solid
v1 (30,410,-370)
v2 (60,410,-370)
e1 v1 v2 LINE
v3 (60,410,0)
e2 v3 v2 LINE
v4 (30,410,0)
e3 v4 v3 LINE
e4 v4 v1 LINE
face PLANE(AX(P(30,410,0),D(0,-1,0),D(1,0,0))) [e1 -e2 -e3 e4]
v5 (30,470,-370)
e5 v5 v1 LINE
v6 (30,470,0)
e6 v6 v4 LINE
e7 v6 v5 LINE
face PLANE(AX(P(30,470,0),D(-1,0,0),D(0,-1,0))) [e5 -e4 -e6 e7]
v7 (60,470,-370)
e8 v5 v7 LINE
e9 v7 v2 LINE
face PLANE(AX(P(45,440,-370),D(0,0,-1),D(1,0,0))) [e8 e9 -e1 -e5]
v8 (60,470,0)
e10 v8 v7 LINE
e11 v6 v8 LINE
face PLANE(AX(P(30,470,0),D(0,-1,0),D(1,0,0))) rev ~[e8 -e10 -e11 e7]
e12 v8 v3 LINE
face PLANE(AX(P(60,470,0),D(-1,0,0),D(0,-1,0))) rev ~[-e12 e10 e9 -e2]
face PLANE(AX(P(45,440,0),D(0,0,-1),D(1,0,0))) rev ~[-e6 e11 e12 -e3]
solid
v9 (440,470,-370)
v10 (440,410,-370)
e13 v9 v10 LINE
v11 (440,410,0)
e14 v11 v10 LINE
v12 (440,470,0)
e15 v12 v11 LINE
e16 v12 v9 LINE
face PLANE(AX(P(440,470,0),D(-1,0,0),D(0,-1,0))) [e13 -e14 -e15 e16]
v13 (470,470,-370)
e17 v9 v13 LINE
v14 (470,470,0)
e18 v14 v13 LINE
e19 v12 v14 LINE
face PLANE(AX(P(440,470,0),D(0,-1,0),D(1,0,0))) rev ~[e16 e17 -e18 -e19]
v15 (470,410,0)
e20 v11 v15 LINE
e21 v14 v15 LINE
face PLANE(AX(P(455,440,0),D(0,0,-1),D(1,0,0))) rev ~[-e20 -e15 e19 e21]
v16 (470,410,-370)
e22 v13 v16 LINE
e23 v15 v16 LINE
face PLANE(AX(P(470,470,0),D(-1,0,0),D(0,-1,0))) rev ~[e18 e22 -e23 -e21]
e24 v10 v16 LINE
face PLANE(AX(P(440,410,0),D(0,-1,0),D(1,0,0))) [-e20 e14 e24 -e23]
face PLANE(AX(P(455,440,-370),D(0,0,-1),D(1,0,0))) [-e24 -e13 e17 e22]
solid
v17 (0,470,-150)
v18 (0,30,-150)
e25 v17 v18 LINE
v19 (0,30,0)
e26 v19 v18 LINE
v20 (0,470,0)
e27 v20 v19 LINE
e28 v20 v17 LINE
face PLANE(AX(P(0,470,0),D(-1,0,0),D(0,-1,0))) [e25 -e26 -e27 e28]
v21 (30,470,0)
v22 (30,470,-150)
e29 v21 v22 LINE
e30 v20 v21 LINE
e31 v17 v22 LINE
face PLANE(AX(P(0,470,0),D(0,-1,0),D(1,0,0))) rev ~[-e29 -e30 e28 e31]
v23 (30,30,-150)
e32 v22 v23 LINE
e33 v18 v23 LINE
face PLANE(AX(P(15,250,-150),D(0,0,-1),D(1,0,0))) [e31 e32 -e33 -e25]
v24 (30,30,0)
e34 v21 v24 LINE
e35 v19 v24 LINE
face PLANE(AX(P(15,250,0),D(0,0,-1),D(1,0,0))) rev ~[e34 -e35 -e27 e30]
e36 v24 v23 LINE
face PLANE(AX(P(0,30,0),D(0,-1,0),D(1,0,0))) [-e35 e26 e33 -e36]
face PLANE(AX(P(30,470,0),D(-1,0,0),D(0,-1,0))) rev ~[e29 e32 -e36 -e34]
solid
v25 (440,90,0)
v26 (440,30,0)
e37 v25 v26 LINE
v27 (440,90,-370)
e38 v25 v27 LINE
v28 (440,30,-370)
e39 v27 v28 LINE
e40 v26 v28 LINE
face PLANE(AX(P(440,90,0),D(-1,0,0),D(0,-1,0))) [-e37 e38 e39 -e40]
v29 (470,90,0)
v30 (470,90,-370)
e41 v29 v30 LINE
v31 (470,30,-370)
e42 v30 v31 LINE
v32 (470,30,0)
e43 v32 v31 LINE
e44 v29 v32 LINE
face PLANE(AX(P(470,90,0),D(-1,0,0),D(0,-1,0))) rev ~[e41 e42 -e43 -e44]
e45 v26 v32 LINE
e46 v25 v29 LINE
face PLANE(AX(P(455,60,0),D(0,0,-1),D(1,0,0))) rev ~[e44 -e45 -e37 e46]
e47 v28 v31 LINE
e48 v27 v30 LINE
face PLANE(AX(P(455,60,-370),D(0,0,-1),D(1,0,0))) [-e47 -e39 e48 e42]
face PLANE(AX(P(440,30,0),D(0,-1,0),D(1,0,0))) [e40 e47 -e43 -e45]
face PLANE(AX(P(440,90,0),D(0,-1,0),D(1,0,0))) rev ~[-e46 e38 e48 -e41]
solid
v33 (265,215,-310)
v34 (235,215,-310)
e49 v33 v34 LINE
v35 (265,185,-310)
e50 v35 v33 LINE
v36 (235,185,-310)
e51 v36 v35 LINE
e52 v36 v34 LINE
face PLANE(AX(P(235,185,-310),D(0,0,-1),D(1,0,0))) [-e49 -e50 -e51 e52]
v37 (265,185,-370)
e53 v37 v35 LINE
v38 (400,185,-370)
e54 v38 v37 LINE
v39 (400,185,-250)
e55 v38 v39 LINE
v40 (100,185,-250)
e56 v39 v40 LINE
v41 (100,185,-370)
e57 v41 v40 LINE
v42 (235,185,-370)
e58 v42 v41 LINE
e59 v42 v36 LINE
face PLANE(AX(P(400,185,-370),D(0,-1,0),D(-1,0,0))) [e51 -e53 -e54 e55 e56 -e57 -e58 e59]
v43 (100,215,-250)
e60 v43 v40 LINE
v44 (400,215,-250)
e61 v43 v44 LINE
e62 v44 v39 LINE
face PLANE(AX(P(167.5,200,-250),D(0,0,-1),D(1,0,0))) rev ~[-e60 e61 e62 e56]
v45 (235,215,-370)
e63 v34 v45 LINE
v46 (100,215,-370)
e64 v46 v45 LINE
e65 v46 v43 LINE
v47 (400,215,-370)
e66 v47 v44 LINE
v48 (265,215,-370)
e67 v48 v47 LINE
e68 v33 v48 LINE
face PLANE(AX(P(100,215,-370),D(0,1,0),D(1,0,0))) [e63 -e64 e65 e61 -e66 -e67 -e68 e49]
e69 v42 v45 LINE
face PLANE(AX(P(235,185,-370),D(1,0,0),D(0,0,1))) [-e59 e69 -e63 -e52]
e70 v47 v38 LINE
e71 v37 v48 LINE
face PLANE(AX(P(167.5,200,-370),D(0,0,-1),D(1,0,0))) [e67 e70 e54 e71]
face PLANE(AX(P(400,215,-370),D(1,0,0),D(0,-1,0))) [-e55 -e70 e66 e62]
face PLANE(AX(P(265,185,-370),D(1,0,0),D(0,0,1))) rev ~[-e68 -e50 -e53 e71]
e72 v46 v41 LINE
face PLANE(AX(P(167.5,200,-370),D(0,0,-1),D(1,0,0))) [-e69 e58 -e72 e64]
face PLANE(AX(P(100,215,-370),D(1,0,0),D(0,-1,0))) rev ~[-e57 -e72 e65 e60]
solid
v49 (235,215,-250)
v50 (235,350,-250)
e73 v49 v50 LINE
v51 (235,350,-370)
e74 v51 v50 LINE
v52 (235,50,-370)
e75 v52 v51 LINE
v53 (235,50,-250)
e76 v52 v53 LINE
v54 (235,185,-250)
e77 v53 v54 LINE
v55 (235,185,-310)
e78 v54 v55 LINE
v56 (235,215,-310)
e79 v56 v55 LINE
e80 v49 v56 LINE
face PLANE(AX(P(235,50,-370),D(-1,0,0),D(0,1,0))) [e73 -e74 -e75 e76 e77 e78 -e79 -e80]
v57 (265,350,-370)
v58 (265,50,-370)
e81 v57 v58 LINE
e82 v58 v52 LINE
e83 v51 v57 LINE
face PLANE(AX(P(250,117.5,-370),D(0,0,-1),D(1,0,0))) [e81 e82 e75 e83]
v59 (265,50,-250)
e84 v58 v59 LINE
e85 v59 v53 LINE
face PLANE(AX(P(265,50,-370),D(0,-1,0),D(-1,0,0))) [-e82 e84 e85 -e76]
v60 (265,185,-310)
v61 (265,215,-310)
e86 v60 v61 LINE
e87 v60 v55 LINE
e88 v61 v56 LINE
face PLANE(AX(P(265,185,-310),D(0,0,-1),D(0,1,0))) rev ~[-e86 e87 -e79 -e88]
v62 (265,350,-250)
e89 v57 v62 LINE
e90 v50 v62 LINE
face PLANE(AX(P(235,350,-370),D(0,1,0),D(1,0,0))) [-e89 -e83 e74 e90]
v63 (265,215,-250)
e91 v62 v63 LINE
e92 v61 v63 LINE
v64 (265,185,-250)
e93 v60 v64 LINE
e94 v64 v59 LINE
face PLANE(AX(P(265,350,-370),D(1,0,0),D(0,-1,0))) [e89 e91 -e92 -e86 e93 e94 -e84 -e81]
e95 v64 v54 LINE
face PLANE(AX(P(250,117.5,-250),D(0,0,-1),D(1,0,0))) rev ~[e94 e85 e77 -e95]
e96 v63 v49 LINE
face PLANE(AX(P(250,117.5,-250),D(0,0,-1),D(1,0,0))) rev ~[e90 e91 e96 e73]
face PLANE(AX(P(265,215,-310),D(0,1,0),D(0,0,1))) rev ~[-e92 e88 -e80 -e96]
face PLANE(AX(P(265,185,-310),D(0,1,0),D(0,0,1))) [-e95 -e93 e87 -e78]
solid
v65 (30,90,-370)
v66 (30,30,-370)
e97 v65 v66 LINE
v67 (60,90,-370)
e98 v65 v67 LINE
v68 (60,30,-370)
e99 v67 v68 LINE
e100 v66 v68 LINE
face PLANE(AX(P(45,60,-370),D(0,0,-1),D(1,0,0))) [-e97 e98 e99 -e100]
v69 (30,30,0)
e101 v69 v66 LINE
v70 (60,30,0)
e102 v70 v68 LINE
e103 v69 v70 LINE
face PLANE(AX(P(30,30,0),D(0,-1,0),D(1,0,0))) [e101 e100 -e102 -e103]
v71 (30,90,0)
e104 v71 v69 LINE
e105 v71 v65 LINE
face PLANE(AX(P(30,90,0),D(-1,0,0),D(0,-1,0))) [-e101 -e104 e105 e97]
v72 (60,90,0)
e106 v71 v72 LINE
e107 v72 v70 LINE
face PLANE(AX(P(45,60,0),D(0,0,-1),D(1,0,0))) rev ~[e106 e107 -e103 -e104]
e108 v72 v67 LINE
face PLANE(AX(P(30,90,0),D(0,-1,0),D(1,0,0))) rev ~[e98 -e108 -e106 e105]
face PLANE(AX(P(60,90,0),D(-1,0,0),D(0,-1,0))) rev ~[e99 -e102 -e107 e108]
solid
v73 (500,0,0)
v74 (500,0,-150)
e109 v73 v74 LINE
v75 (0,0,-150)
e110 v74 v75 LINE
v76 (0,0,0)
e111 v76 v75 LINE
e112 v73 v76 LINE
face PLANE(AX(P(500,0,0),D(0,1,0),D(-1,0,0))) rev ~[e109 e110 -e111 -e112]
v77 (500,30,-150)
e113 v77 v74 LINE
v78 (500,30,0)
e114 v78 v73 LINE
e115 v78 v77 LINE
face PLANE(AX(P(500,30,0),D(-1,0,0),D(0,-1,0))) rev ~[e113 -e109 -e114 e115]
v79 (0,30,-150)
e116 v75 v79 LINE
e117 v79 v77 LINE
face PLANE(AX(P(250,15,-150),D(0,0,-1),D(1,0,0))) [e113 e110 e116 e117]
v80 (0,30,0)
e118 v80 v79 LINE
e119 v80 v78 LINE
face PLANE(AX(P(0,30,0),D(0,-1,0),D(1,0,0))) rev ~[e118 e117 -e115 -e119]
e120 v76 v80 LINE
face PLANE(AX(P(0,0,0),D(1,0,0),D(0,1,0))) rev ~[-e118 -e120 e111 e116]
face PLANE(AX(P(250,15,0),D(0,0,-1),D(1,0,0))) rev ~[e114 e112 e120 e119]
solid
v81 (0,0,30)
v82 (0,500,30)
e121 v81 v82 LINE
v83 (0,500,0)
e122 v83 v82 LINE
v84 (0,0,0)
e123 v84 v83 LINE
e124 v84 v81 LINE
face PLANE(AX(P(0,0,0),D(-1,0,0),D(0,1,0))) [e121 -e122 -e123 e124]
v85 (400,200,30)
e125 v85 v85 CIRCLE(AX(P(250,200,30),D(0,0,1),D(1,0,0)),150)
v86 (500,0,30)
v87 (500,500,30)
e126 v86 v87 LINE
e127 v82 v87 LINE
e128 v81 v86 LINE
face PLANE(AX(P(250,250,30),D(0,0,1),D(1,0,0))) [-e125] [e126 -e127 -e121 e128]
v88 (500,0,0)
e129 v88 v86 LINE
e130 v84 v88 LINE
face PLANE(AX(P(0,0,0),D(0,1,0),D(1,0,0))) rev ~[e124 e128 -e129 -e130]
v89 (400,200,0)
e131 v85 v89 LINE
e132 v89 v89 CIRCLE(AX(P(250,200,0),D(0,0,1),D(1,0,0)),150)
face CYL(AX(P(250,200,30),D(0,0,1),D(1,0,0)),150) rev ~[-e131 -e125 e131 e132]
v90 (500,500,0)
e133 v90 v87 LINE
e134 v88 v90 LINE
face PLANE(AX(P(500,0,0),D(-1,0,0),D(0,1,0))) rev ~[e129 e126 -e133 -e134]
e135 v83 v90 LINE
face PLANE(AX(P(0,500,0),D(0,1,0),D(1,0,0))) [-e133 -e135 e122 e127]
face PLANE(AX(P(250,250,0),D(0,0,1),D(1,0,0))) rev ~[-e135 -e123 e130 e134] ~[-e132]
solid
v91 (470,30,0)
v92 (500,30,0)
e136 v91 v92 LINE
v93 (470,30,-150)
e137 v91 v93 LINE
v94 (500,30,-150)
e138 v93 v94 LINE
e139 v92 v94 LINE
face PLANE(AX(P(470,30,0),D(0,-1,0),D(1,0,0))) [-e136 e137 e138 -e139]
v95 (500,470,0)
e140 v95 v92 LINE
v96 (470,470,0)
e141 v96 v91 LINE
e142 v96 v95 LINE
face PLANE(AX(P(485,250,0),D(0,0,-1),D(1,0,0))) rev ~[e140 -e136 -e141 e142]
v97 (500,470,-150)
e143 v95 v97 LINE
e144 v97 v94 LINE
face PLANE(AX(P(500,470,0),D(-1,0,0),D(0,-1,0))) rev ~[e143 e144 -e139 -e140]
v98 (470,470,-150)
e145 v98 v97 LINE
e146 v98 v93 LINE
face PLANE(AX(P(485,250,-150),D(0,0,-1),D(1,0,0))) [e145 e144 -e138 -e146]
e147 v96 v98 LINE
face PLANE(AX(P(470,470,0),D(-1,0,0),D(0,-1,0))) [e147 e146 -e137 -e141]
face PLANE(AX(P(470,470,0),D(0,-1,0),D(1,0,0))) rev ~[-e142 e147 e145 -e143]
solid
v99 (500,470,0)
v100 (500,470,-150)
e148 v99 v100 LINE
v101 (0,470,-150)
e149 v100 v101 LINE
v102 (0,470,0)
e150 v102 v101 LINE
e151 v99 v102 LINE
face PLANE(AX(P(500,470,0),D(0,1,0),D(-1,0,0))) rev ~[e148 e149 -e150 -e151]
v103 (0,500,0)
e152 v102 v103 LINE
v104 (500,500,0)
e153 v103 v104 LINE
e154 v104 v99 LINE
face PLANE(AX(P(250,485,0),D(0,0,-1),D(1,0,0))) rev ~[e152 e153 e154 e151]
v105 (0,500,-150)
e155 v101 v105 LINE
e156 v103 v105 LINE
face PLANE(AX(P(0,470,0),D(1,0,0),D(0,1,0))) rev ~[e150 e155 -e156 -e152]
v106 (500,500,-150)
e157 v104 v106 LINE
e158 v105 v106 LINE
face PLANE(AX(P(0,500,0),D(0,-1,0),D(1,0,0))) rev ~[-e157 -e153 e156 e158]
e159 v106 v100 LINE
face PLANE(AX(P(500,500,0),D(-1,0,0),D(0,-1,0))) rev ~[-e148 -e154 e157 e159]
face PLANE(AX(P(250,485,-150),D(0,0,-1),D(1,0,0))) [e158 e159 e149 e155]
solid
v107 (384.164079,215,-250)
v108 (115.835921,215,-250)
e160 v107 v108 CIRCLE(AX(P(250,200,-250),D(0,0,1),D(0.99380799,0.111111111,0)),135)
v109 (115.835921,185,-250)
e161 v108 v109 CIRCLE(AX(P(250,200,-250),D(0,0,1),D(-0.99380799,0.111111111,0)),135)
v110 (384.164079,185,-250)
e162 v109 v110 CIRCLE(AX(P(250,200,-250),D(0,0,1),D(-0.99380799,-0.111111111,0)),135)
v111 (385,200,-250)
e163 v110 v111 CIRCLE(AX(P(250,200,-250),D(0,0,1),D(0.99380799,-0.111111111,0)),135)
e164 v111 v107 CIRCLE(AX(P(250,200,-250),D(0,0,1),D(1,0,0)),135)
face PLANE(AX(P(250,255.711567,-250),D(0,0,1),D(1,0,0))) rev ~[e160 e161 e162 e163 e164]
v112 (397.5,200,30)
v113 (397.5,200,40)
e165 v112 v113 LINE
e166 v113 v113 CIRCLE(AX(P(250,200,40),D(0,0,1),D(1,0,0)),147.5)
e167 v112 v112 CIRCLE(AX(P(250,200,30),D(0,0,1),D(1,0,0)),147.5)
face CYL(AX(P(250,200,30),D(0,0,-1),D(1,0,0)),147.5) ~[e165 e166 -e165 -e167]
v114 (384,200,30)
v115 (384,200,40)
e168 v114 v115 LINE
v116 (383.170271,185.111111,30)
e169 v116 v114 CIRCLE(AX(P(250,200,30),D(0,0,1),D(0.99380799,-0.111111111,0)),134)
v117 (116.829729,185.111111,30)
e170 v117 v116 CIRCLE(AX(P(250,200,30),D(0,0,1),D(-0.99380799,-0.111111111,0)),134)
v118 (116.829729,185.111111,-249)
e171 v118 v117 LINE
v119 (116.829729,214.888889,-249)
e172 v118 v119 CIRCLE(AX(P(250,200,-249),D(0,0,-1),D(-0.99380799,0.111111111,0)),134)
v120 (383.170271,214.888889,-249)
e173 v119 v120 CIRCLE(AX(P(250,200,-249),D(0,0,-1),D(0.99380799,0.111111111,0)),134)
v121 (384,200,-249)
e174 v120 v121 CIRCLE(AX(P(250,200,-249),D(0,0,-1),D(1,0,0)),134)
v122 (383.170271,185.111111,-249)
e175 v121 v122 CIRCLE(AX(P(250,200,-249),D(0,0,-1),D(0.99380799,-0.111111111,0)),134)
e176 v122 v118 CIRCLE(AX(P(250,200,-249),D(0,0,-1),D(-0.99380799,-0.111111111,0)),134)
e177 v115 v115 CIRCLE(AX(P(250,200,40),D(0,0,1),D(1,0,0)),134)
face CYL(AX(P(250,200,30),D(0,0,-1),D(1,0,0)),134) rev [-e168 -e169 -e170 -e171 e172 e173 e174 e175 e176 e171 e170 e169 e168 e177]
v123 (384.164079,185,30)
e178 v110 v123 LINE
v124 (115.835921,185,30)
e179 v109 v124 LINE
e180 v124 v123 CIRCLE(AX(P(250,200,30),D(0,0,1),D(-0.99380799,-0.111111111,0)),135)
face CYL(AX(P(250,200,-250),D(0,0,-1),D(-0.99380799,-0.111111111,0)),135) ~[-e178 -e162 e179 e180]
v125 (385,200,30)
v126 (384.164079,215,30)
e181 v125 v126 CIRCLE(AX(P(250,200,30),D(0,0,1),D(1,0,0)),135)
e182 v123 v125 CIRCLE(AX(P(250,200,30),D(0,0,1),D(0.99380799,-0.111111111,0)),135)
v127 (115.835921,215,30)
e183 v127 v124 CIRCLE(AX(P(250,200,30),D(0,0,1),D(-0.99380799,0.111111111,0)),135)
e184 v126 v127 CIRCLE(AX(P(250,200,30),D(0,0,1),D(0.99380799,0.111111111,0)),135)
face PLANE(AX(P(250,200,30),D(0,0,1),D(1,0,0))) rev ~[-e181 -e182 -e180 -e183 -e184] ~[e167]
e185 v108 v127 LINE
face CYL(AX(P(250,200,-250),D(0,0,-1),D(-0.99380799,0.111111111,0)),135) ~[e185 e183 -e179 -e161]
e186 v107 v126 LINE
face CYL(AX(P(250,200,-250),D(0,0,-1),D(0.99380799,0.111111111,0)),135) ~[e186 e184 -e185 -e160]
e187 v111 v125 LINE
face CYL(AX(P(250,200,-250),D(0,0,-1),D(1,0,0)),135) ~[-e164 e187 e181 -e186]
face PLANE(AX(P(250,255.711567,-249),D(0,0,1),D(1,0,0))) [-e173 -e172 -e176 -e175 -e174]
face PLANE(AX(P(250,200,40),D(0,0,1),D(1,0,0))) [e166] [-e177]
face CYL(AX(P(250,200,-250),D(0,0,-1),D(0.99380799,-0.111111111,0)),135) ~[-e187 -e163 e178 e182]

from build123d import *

# Parameters (mm, degrees)
F0_W      = 500
F0_H      = 500
F1_DEPTH  = 30
F2_W      = 30
F2_H      = 60
F19_DEPTH = 370
F20_DEPTH = 150
F3_W      = 30
F3_H      = 440
F4_DEPTH  = 150
F5_DEPTH  = 150
F6_R      = 150
F21_DEPTH = 400.001
F8_DEPTH  = 120
F7_W      = 135
F7_H      = 30
F9_DEPTH  = 120
F10_W     = 30
F10_H     = 60
F11_DEPTH = 265.001
F12_W     = 30
F12_H     = 60
F13_DEPTH = 315.001
F15_DEPTH = 280
F16_T     = -1
F17_R     = 147.5
F17_R_2   = 135
F17_R_3   = 134
F18_DEPTH = 10


with BuildPart() as f1:
    # F0 (on Top) → F1 (new body)
    with BuildSketch(Plane.XY):
        with Locations((250, 250)):
            Rectangle(F0_W, F0_H)
    extrude(amount=F1_DEPTH)

    # F6 (on face) → F21 (cut, through all)
    with BuildSketch(Plane.XY.offset(30)):
        with Locations((250, 200)):
            Circle(F6_R)
    extrude(amount=-F21_DEPTH, mode=Mode.SUBTRACT)


with BuildPart() as f19:
    # F2 (on face) → F19 (new body)
    with BuildSketch(Plane(origin=(0, 0, 0), x_dir=(1, 0, 0), z_dir=(0, 0, -1))):
        with Locations((45, -60)):
            Rectangle(F2_W, F2_H)
    extrude(amount=F19_DEPTH)


with BuildPart() as f19b:
    # F2 (on face) → F19, piece 2 (new body)
    with BuildSketch(Plane(origin=(0, 0, 0), x_dir=(1, 0, 0), z_dir=(0, 0, -1))):
        with Locations((455, -60)):
            Rectangle(F2_W, F2_H)
    extrude(amount=F19_DEPTH)


with BuildPart() as f19c:
    # F2 (on face) → F19, piece 3 (new body)
    with BuildSketch(Plane(origin=(0, 0, 0), x_dir=(1, 0, 0), z_dir=(0, 0, -1))):
        with Locations((455, -440)):
            Rectangle(F2_W, F2_H)
    extrude(amount=F19_DEPTH)


with BuildPart() as f19d:
    # F2 (on face) → F19, piece 4 (new body)
    with BuildSketch(Plane(origin=(0, 0, 0), x_dir=(1, 0, 0), z_dir=(0, 0, -1))):
        with Locations((45, -440)):
            Rectangle(F2_W, F2_H)
    extrude(amount=F19_DEPTH)


with BuildPart() as f20:
    # F3 (on face) → F20 (new body)
    with BuildSketch(Plane(origin=(0, 0, 0), x_dir=(1, 0, 0), z_dir=(0, 0, -1))):
        Polygon((0, 0), (0, -30), (30, -30), (470, -30), (500, -30), (500, 0), align=None)
    extrude(amount=F20_DEPTH)


with BuildPart() as f4:
    # F3 (on face) → F4 (new body)
    with BuildSketch(Plane(origin=(0, 0, 0), x_dir=(1, 0, 0), z_dir=(0, 0, -1))):
        with Locations((15, -250)):
            Rectangle(F3_W, F3_H)
    extrude(amount=F4_DEPTH)


with BuildPart() as f4b:
    # F3 (on face) → F4, piece 2 (new body)
    with BuildSketch(Plane(origin=(0, 0, 0), x_dir=(1, 0, 0), z_dir=(0, 0, -1))):
        with Locations((485, -250)):
            Rectangle(F3_W, F3_H)
    extrude(amount=F4_DEPTH)


with BuildPart() as f5:
    # F3 (on face) → F5 (new body)
    with BuildSketch(Plane(origin=(0, 0, 0), x_dir=(1, 0, 0), z_dir=(0, 0, -1))):
        Polygon((30, -470), (0, -470), (0, -500), (500, -500), (500, -470), (470, -470), align=None)
    extrude(amount=F5_DEPTH)


with BuildPart() as f8:
    # F7 (on face) → F8 (new body)
    with BuildSketch(Plane(origin=(0, 0, -370), x_dir=(1, 0, 0), z_dir=(0, 0, -1))):
        Polygon((250, -185), (265, -185), (265, -50), (235, -50), (235, -185), align=None)
        Polygon((235, -185), (235, -215), (250, -215), (250, -200), (250, -185), align=None)
        Polygon((250, -215), (265, -215), (265, -185), (250, -185), (250, -200), align=None)
        Polygon((235, -350), (265, -350), (265, -215), (250, -215), (235, -215), align=None)
    extrude(amount=-F8_DEPTH)

    # F10 (on face) → F11 (cut, through all)
    with BuildSketch(Plane.YZ.offset(265)):
        with Locations((200, -280)):
            Rectangle(F10_W, F10_H)
    extrude(amount=-F11_DEPTH, mode=Mode.SUBTRACT)


with BuildPart() as f9:
    # F7 (on face) → F9 (new body)
    with BuildSketch(Plane(origin=(0, 0, -370), x_dir=(1, 0, 0), z_dir=(0, 0, -1))):
        with Locations((167.5, -200)):
            Rectangle(F7_W, F7_H)
        Polygon((250, -215), (265, -215), (265, -185), (250, -185), (250, -200), align=None)
        Polygon((235, -185), (235, -215), (250, -215), (250, -200), (250, -185), align=None)
        with Locations((332.5, -200)):
            Rectangle(F7_W, F7_H)
    extrude(amount=-F9_DEPTH)

    # F12 (on face) → F13 (cut, through all)
    with BuildSketch(Plane.XZ.offset(-185)):
        with Locations((250, -340)):
            Rectangle(F12_W, F12_H)
    extrude(amount=-F13_DEPTH, mode=Mode.SUBTRACT)


with BuildPart() as f15:
    # F14 (on face) → F15 (new body)
    with BuildSketch(Plane.XY.offset(-250)):
        with BuildLine():
            Line((115.83592135, 215), (384.16407865, 215))
            ThreePointArc((384.16407865, 215), (250, 335), (115.83592135, 215))
        make_face()
        with BuildLine():
            ThreePointArc((115.83592135, 185), (250, 65), (384.16407865, 185))
            Line((384.16407865, 185), (115.83592135, 185))
        make_face()
        with BuildLine():
            ThreePointArc((384.16407865, 185), (384.7908576606, 192.488362953), (385, 200))
            ThreePointArc((385, 200), (384.7908576606, 207.511637047), (384.16407865, 215))
            Line((384.16407865, 215), (115.83592135, 215))
            ThreePointArc((115.83592135, 215), (115, 200), (115.83592135, 185))
            Line((115.83592135, 185), (384.16407865, 185))
        make_face()
    extrude(amount=F15_DEPTH)

    # F16
    f16_openings = [f15.faces().sort_by_distance(p)[0] for p in [
        (250, 200, 30),
    ]]
    offset(amount=F16_T, openings=f16_openings)

    # F17 (on face) → F18 (join)
    with BuildSketch(Plane.XY.offset(30)):
        with Locations((250, 200)):
            Circle(F17_R)
        with Locations((250, 200)):
            Circle(F17_R_2, mode=Mode.SUBTRACT)
        with Locations((250, 200)):
            Circle(F17_R_2)
        with Locations((250, 200)):
            Circle(F17_R_3, mode=Mode.SUBTRACT)
    extrude(amount=F18_DEPTH)


solid = Compound([f1.part, f19.part, f19b.part, f19c.part, f19d.part, f20.part, f4.part, f4b.part, f5.part, f8.part, f9.part, f15.part])
